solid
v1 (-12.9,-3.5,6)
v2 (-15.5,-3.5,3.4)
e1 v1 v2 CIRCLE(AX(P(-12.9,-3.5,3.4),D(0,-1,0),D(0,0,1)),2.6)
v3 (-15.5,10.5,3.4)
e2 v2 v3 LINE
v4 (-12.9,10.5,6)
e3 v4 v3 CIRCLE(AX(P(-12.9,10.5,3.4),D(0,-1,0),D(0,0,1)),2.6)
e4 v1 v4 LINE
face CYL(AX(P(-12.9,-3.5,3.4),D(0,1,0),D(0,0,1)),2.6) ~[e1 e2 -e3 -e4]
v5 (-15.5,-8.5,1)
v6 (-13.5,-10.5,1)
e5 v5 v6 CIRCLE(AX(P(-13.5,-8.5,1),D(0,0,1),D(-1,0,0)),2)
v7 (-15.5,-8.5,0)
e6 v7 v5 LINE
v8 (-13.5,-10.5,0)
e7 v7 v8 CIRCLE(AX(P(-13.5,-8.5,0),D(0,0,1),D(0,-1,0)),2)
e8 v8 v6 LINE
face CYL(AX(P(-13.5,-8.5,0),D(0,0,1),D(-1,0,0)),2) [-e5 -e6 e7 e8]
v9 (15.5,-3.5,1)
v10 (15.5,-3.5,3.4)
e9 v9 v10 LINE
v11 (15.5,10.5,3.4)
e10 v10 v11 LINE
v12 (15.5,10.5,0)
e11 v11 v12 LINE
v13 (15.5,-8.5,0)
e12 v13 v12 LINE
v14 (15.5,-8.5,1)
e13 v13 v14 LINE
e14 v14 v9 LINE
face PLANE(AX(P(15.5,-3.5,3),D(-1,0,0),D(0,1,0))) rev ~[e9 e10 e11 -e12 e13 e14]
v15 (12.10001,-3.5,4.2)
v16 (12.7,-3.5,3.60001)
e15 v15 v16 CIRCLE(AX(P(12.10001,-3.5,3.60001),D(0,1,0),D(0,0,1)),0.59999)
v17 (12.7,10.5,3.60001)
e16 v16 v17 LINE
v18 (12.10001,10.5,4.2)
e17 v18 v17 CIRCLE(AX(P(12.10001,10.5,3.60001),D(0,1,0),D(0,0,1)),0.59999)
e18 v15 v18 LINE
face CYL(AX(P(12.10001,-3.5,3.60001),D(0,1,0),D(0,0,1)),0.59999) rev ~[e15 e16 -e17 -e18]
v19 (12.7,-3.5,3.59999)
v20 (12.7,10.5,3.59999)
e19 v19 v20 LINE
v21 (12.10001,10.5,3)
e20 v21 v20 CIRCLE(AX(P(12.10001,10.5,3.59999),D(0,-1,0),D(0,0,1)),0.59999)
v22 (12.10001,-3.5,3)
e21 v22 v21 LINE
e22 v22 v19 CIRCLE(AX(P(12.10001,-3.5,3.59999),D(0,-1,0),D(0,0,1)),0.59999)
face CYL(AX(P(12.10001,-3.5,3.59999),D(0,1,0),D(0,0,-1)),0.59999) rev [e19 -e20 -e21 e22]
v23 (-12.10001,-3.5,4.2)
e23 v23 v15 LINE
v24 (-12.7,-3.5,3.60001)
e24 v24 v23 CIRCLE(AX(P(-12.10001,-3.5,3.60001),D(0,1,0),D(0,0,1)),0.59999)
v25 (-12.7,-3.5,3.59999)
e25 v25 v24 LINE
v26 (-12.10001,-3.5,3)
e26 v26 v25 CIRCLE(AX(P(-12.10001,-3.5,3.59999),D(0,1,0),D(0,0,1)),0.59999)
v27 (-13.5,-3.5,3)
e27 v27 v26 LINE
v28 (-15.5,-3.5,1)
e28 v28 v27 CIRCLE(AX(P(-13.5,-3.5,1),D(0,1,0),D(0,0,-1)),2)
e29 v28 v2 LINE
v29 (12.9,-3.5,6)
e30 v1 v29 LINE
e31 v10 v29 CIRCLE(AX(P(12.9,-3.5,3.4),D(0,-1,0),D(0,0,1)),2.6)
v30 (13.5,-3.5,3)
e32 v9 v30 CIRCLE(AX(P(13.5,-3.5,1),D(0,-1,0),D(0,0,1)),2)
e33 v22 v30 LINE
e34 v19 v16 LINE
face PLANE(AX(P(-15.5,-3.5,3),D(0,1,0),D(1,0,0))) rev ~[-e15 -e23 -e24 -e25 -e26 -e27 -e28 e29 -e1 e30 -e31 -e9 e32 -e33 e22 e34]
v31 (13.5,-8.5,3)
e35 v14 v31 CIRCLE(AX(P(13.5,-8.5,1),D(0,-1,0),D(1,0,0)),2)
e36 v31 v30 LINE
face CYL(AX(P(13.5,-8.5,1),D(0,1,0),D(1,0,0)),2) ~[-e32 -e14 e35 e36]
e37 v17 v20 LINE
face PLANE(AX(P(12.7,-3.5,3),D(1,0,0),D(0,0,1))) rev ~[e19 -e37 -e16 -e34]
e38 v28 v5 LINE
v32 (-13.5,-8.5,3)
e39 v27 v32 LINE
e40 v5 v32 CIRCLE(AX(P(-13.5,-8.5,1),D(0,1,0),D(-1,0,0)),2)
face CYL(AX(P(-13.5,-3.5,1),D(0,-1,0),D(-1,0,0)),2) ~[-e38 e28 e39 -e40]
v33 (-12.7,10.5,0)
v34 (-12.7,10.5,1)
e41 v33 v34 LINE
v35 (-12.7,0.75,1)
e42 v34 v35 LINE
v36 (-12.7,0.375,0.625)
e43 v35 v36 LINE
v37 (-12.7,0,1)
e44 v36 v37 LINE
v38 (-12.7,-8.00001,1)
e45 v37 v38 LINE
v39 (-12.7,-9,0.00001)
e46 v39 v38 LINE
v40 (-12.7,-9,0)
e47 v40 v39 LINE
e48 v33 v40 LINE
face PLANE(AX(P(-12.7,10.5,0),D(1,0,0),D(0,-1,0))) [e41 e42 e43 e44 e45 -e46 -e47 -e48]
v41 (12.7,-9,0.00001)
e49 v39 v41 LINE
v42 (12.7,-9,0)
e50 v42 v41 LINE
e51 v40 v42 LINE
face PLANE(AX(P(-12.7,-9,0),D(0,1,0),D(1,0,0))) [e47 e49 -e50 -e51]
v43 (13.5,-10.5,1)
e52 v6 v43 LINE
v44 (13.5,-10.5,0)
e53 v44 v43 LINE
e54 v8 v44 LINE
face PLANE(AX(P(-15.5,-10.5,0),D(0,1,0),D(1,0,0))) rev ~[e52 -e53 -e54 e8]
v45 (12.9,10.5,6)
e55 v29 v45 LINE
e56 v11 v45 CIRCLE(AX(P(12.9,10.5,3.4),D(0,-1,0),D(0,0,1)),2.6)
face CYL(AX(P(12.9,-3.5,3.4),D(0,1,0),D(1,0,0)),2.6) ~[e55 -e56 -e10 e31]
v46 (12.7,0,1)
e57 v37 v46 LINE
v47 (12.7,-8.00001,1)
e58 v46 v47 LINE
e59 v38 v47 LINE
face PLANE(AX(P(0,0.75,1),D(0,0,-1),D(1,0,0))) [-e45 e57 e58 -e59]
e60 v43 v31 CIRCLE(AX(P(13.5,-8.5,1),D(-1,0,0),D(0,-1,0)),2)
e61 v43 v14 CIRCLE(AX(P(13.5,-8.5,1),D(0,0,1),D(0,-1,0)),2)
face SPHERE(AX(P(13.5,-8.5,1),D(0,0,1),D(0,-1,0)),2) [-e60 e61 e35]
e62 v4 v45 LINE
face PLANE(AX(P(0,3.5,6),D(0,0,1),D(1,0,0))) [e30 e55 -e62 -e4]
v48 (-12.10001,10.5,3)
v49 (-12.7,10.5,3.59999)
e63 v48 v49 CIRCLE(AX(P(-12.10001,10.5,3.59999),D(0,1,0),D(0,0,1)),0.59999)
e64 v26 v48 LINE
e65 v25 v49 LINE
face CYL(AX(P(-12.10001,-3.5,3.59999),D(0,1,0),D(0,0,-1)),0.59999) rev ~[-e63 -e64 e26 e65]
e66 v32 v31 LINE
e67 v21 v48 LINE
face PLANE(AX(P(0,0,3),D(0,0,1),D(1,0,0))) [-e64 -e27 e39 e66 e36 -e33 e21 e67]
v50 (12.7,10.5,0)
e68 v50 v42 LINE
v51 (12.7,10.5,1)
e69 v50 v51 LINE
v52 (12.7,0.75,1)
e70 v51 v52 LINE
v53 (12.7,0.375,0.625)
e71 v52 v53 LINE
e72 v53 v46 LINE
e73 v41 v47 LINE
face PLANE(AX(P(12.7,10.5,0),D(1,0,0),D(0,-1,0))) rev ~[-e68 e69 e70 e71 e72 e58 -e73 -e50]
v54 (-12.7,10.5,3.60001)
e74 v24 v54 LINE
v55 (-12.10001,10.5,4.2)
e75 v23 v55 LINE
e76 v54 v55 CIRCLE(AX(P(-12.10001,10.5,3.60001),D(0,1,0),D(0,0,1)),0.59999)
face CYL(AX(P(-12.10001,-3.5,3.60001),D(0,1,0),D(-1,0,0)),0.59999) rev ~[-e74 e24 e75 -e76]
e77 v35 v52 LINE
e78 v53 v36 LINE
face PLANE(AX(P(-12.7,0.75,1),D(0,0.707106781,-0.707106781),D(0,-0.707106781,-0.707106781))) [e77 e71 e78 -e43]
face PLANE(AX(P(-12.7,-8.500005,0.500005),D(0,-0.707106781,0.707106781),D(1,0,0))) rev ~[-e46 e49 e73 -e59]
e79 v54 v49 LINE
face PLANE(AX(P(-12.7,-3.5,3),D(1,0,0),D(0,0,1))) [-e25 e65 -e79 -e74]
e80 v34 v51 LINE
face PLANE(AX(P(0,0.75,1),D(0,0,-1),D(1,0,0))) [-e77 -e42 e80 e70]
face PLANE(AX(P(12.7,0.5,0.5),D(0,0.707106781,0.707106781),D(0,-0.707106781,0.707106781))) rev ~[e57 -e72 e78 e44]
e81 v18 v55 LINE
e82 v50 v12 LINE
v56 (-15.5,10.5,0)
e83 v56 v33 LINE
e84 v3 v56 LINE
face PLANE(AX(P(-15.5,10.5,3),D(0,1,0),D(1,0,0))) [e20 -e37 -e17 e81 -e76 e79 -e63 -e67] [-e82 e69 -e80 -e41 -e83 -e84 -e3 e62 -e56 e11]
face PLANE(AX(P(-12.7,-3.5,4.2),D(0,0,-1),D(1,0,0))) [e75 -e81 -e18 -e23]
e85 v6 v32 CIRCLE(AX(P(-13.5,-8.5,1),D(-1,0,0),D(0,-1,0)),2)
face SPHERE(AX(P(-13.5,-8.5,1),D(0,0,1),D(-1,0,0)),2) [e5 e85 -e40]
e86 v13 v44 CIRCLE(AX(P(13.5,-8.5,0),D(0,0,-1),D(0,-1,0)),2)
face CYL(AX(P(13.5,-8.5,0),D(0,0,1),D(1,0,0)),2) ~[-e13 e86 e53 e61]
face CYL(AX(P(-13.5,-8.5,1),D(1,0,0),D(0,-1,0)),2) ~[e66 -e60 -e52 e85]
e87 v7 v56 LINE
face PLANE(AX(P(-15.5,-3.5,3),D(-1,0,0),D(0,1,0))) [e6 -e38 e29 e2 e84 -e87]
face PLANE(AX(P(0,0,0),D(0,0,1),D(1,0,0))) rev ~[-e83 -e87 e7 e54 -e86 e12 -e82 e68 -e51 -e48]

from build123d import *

# Parameters (mm, degrees)
F0_W         = 31
F0_H         = 21
F1_DEPTH     = 3
F2_W         = 31
F2_H         = 14
F3_DEPTH     = 3
F4_W         = 25.4
F4_H         = 1.2
F5_DEPTH     = 25
F6_W         = 25.4
F6_H         = 19.5
F7_DEPTH     = 1
F8_R         = 0.59999
F9_R         = 2.6
F10_W        = 25.4
F10_H        = 0.75
F11_DEPTH    = 0.5
F12_T4_DEPTH = 25.4
F12_T9_DEPTH = 25.4
F13_R        = 2
F14_SIZE     = 0.99999
F15_R        = 2


# Not quite as in the source:
# - a fillet or chamfer that OpenCascade refuses, or shapes differently, is made with other operations: its cross-section is extruded or revolved along the edge and cut away or added
# - a fillet or chamfer is up to 0.001 mm smaller than in the source, because OpenCascade refuses the exact size


with BuildPart() as f1:
    # F0 (on Top) → F1 (new body)
    with BuildSketch(Plane.XY):
        Rectangle(F0_W, F0_H)
    extrude(amount=F1_DEPTH)

    # F2 (on face) → F3 (join)
    with BuildSketch(Plane.XY.offset(3)):
        with Locations((0, 3.5)):
            Rectangle(F2_W, F2_H)
    extrude(amount=F3_DEPTH)

    # F4 (on face) → F5 (cut)
    with BuildSketch(Plane.XZ.offset(3.5)):
        with Locations((0, 3.6)):
            Rectangle(F4_W, F4_H)
    extrude(amount=-F5_DEPTH, mode=Mode.SUBTRACT)

    # F6 (on face) → F7 (cut)
    with BuildSketch(Plane(origin=(0, 0, 0), x_dir=(1, 0, 0), z_dir=(0, 0, -1))):
        with Locations((0, -0.75)):
            Rectangle(F6_W, F6_H)
    extrude(amount=-F7_DEPTH, mode=Mode.SUBTRACT)

    # F8 (radius 0.6 in the source; OpenCascade refuses exactly that, so slightly less here)
    f8_edges = [f1.edges().sort_by_distance(p)[0] for p in [
        (12.7, 3.5, 4.2),
        (12.7, 3.5, 3),
        (-12.7, 3.5, 3),
        (-12.7, 3.5, 4.2),
    ]]
    fillet(f8_edges, radius=F8_R)

    # F9
    f9_edges = [f1.edges().sort_by_distance(p)[0] for p in [
        (-15.5, 3.5, 6),
        (15.5, 3.5, 6),
    ]]
    fillet(f9_edges, radius=F9_R)

    # F10 (on face) → F11 (join)
    with BuildSketch(Plane(origin=(0, 0, 1), x_dir=(1, 0, 0), z_dir=(0, 0, -1))):
        with Locations((0, -0.375)):
            Rectangle(F10_W, F10_H)
    extrude(amount=F11_DEPTH)

    # F12: chamfer of 0.5 on 2 edges, made by hand


with BuildPart() as f12_tool2:
    # F12_s3 → F12_t4 (new body)
    with BuildSketch(Plane.YZ.offset(12.7)):
        Polygon((0.5, 0.5), (0, 1), (0, 0.5), align=None)
    extrude(amount=-F12_T4_DEPTH)

    split(bisect_by=Plane.XY.offset(1), keep=Keep.BOTTOM)


with BuildPart() as f1_1:
    add(f1.part)

    # F12_t1: cut F12_tool2
    add(f12_tool2.part, mode=Mode.SUBTRACT)


with BuildPart() as f12_tool7:
    # F12_s8 → F12_t9 (new body)
    with BuildSketch(Plane.YZ.offset(-12.7)):
        Polygon((0.75, 1), (0.25, 0.5), (0.75, 0.5), align=None)
    extrude(amount=F12_T9_DEPTH)

    split(bisect_by=Plane.XY.offset(1), keep=Keep.BOTTOM)


with BuildPart() as f1_2:
    add(f1_1.part)

    # F12_t6: cut F12_tool7
    add(f12_tool7.part, mode=Mode.SUBTRACT)

    # F13
    f13_edges = [f1_2.edges().sort_by_distance(p)[0] for p in [
        (15.5, -10.5, 1.5),
        (-15.5, -10.5, 1.5),
    ]]
    fillet(f13_edges, radius=F13_R)

    # F14 (size 1 in the source; OpenCascade refuses exactly that, so slightly less here)
    f14_edges = [f1_2.edges().sort_by_distance(p)[0] for p in [
        (0, -9, 1),
    ]]
    chamfer(f14_edges, length=F14_SIZE)

    # F15
    f15_edges = [f1_2.edges().sort_by_distance(p)[0] for p in [
        (0, -10.5, 3),
    ]]
    fillet(f15_edges, radius=F15_R)


solid = f1_2.part
